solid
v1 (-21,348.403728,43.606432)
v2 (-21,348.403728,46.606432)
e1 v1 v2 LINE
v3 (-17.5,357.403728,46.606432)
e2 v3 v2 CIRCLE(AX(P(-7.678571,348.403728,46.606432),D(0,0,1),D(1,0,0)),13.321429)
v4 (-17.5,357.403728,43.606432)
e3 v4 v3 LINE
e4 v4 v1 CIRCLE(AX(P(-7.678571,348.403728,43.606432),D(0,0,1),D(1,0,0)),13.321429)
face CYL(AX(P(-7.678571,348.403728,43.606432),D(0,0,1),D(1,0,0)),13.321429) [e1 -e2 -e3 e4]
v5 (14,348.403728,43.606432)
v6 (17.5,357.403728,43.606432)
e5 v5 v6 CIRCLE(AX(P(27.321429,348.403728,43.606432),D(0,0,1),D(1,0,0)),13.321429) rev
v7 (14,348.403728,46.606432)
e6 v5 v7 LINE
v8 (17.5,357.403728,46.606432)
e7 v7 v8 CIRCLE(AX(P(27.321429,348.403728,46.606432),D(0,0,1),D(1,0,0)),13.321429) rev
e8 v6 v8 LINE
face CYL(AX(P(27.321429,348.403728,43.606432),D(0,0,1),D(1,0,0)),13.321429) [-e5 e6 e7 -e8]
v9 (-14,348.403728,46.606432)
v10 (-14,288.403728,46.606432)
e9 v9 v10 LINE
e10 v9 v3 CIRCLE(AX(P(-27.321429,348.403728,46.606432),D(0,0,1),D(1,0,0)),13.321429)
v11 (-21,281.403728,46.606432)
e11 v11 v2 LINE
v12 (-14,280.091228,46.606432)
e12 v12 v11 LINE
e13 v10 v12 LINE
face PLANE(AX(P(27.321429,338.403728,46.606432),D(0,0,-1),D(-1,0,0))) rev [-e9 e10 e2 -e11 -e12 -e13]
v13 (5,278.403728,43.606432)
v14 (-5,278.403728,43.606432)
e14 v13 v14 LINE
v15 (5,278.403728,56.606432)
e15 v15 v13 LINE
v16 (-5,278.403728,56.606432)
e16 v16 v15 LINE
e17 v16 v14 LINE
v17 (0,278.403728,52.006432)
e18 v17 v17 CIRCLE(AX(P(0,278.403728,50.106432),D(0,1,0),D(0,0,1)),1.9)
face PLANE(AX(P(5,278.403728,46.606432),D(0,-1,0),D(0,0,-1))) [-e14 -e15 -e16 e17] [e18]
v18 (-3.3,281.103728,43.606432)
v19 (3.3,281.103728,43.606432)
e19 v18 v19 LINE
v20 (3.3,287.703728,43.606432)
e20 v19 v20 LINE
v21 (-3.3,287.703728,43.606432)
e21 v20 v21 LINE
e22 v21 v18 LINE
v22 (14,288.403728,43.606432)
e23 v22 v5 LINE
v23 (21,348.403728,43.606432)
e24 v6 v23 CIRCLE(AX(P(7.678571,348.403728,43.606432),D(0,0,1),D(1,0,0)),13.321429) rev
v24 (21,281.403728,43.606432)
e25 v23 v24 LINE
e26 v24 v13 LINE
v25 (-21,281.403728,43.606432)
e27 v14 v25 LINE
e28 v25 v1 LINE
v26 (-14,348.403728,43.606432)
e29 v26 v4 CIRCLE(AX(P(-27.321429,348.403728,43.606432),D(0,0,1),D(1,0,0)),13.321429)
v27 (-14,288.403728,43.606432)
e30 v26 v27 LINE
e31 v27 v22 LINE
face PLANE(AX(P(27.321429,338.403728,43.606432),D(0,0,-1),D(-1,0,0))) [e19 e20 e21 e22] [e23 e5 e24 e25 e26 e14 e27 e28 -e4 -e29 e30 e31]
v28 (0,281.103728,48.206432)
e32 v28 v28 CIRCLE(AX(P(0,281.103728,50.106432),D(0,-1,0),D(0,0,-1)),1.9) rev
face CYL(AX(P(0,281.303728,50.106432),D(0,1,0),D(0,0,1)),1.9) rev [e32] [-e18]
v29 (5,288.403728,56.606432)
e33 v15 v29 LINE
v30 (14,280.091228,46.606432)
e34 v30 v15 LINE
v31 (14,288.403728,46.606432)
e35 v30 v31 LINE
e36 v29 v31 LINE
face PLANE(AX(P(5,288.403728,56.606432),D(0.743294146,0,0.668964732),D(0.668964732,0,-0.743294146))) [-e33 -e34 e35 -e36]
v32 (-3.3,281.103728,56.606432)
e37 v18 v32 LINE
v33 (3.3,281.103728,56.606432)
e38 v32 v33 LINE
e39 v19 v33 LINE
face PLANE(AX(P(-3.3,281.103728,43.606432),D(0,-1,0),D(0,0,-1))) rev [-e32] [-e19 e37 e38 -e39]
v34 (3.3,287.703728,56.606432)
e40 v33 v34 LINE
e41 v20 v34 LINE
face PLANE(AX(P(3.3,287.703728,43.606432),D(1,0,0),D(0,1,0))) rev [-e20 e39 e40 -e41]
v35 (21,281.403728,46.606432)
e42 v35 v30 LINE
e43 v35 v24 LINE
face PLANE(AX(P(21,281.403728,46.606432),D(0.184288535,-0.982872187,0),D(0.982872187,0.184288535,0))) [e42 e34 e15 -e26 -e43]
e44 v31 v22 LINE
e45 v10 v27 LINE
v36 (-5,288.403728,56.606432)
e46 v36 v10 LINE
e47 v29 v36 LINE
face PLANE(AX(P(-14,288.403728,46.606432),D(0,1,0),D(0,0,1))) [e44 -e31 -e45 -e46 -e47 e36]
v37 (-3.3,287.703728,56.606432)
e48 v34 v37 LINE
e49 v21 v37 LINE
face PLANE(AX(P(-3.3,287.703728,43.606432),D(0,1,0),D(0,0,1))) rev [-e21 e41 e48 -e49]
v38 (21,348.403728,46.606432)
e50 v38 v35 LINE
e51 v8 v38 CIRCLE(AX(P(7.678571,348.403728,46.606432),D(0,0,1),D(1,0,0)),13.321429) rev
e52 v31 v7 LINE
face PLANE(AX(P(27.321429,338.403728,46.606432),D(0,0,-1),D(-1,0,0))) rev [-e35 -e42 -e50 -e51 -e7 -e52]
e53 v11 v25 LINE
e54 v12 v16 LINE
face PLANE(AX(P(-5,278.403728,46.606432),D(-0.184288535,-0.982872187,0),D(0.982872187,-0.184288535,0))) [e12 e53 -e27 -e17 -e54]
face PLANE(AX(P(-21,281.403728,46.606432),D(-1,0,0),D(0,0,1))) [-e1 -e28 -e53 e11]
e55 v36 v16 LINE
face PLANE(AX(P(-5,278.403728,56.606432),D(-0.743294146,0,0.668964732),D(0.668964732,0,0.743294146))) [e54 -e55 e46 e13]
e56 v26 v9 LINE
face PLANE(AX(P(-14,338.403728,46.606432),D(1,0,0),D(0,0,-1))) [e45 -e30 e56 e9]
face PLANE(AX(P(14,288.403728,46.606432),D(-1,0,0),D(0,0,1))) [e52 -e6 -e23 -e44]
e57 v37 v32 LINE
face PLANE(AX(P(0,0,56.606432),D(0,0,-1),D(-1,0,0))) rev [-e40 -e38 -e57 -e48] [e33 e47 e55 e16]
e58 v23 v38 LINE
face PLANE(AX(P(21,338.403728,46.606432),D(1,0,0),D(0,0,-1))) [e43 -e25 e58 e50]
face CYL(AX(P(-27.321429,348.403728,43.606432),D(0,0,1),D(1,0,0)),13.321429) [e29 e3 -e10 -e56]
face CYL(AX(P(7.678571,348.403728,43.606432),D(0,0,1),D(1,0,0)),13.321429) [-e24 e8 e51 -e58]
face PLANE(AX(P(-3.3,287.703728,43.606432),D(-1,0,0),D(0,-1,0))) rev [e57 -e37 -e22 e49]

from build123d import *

# Parameters (mm, degrees)
SALIENTE_EXTRUIR1_DEPTH             = 3
CROQUIS2_W                          = 10
CROQUIS2_H                          = 10
SALIENTE_EXTRUIR2_DEPTH             = 10
CROQUIS3_W                          = 6.2
CROQUIS3_H                          = 6.2
CORTAR_EXTRUIR1_DEPTH               = 349.280563017
NGULO_START                         = 278.403728499
NGULO_DE_SALIDA1_DEPTH              = 10
NGULO_START_2                       = 46.606431878
NGULO_DE_SALIDA1_2_DEPTH            = 11.393568122
DI_METRO_DE_TALADRO_3_8_3_8_1_D     = 3.8
DI_METRO_DE_TALADRO_3_8_3_8_1_DEPTH = 2.9
REDONDEO1_R                         = 0.4
CROQUIS7_W                          = 7
CROQUIS7_H                          = 10
SALIENTE_EXTRUIR3_DEPTH             = 3
CROQUIS8_W                          = 6.6
CROQUIS8_H                          = 6.6
CORTAR_EXTRUIR2_DEPTH               = 359.256088776


with BuildPart() as part:
    # Croquis1 → Saliente-Extruir1 (new body)
    with BuildSketch(Plane(origin=(0, 0, 43.606431878), x_dir=(-1, 0, 0), z_dir=(0, 0, -1))):
        with BuildLine():
            Line((-21, 338.403728499), (-21, 281.403728499))
            Line((-21, 281.403728499), (-5, 278.403728499))
            Line((-5, 278.403728499), (5, 278.403728499))
            Line((5, 278.403728499), (21, 281.403728499))
            Line((21, 281.403728499), (21, 338.403728499))
            ThreePointArc((21, 338.403728499), (20.094205089, 343.232030478), (17.5, 347.403728499))
            ThreePointArc((17.5, 347.403728499), (14.905794911, 343.232030478), (14, 338.403728499))
            Line((14, 338.403728499), (14, 288.403728499))
            Line((14, 288.403728499), (-14, 288.403728499))
            Line((-14, 288.403728499), (-14, 338.403728499))
            ThreePointArc((-14, 338.403728499), (-14.905794911, 343.232030478), (-17.5, 347.403728499))
            ThreePointArc((-17.5, 347.403728499), (-20.094205089, 343.232030478), (-21, 338.403728499))
        make_face()
    extrude(amount=-SALIENTE_EXTRUIR1_DEPTH)

    # Croquis2 → Saliente-Extruir2 (add)
    with BuildSketch(Plane.XY.offset(46.606431878)):
        with Locations((0, 283.403728499)):
            Rectangle(CROQUIS2_W, CROQUIS2_H)
    extrude(amount=SALIENTE_EXTRUIR2_DEPTH)

    # Croquis3 → Cortar-Extruir1 (cut, through all)
    with BuildSketch(Plane.XY.offset(56.606431878)):
        with Locations((0, 284.403728499)):
            Rectangle(CROQUIS3_W, CROQUIS3_H)
    extrude(amount=-CORTAR_EXTRUIR1_DEPTH, mode=Mode.SUBTRACT)

    # Ángulo de salida1: read off the stored shape, not the designer's step
    # Ángulo de salida1 outline → Ángulo de salida1 (add)
    with BuildSketch(Plane(origin=(0, 0, 0), x_dir=(1, 0, 0), z_dir=(0, 1, 0)).offset(NGULO_START)):
        Polygon((-5, -46.606431878), (-14, -46.606431878), (-5, -56.606431878), align=None)
        Polygon((5, -46.606431878), (5, -56.606431878), (14, -46.606431878), align=None)
    extrude(amount=NGULO_DE_SALIDA1_DEPTH)

    # ngulo de salida1 2 outline → ngulo de salida1 2 (cut)
    with BuildSketch(Plane.XY.offset(NGULO_START_2)):
        Polygon((-5, 278.403728499), (-16, 280.466228499), (-16, 278.403728499), align=None)
        Polygon((15, 280.278728499), (5, 278.403728499), (15, 278.403728499), align=None)
    extrude(amount=NGULO_DE_SALIDA1_2_DEPTH, mode=Mode.SUBTRACT)

    # Diámetro de taladro Ø3.8 (3.8)1
    with Locations(Plane(origin=(0, 281.303728499, 0), x_dir=(1, 0, 0), z_dir=(0, 1, 0))):
        with Locations((0, -50.106431878)):
            Hole(DI_METRO_DE_TALADRO_3_8_3_8_1_D / 2, depth=DI_METRO_DE_TALADRO_3_8_3_8_1_DEPTH)

    # Redondeo1
    redondeo1_edges = [part.edges().sort_by_distance(p)[0] for p in [
        (-17.5, 347.403728499, 45.106431878),
        (17.5, 347.403728499, 45.106431878),
    ]]
    fillet(redondeo1_edges, radius=REDONDEO1_R)

    # Croquis7 → Saliente-Extruir3 (add, through all)
    with BuildSketch(Plane.XY.offset(46.606431878)):
        with BuildLine():
            Line((-14, 338.403728499), (-14, 348.403728499))
            Line((-14, 348.403728499), (-21, 348.403728499))
            Line((-21, 348.403728499), (-21, 338.403728499))
            ThreePointArc((-21, 338.403728499), (-20.175493128, 343.017556325), (-17.804035379, 347.060254302))
            ThreePointArc((-17.804035379, 347.060254302), (-17.5, 347.20032645), (-17.195964621, 347.060254302))
            ThreePointArc((-17.195964621, 347.060254302), (-14.824506872, 343.017556325), (-14, 338.403728499))
        make_face()
        with BuildLine():
            ThreePointArc((-14, 348.403728499), (-14.905794911, 353.232030478), (-17.5, 357.403728499))
            ThreePointArc((-17.5, 357.403728499), (-20.094205089, 353.232030478), (-21, 348.403728499))
            Line((-21, 348.403728499), (-14, 348.403728499))
        make_face()
        with BuildLine():
            ThreePointArc((14, 348.403728499), (14.905794911, 353.232030478), (17.5, 357.403728499))
            ThreePointArc((17.5, 357.403728499), (20.094205089, 353.232030478), (21, 348.403728499))
            Line((21, 348.403728499), (14, 348.403728499))
        make_face()
        with Locations((17.5, 343.403728499)):
            Rectangle(CROQUIS7_W, CROQUIS7_H)
    extrude(amount=-SALIENTE_EXTRUIR3_DEPTH)

    # Croquis8 → Cortar-Extruir2 (cut, through all)
    with BuildSketch(Plane.XY.offset(56.606431878)):
        with Locations((0, 284.403728499)):
            Rectangle(CROQUIS8_W, CROQUIS8_H)
    extrude(amount=-CORTAR_EXTRUIR2_DEPTH, mode=Mode.SUBTRACT)


solid = part.part
